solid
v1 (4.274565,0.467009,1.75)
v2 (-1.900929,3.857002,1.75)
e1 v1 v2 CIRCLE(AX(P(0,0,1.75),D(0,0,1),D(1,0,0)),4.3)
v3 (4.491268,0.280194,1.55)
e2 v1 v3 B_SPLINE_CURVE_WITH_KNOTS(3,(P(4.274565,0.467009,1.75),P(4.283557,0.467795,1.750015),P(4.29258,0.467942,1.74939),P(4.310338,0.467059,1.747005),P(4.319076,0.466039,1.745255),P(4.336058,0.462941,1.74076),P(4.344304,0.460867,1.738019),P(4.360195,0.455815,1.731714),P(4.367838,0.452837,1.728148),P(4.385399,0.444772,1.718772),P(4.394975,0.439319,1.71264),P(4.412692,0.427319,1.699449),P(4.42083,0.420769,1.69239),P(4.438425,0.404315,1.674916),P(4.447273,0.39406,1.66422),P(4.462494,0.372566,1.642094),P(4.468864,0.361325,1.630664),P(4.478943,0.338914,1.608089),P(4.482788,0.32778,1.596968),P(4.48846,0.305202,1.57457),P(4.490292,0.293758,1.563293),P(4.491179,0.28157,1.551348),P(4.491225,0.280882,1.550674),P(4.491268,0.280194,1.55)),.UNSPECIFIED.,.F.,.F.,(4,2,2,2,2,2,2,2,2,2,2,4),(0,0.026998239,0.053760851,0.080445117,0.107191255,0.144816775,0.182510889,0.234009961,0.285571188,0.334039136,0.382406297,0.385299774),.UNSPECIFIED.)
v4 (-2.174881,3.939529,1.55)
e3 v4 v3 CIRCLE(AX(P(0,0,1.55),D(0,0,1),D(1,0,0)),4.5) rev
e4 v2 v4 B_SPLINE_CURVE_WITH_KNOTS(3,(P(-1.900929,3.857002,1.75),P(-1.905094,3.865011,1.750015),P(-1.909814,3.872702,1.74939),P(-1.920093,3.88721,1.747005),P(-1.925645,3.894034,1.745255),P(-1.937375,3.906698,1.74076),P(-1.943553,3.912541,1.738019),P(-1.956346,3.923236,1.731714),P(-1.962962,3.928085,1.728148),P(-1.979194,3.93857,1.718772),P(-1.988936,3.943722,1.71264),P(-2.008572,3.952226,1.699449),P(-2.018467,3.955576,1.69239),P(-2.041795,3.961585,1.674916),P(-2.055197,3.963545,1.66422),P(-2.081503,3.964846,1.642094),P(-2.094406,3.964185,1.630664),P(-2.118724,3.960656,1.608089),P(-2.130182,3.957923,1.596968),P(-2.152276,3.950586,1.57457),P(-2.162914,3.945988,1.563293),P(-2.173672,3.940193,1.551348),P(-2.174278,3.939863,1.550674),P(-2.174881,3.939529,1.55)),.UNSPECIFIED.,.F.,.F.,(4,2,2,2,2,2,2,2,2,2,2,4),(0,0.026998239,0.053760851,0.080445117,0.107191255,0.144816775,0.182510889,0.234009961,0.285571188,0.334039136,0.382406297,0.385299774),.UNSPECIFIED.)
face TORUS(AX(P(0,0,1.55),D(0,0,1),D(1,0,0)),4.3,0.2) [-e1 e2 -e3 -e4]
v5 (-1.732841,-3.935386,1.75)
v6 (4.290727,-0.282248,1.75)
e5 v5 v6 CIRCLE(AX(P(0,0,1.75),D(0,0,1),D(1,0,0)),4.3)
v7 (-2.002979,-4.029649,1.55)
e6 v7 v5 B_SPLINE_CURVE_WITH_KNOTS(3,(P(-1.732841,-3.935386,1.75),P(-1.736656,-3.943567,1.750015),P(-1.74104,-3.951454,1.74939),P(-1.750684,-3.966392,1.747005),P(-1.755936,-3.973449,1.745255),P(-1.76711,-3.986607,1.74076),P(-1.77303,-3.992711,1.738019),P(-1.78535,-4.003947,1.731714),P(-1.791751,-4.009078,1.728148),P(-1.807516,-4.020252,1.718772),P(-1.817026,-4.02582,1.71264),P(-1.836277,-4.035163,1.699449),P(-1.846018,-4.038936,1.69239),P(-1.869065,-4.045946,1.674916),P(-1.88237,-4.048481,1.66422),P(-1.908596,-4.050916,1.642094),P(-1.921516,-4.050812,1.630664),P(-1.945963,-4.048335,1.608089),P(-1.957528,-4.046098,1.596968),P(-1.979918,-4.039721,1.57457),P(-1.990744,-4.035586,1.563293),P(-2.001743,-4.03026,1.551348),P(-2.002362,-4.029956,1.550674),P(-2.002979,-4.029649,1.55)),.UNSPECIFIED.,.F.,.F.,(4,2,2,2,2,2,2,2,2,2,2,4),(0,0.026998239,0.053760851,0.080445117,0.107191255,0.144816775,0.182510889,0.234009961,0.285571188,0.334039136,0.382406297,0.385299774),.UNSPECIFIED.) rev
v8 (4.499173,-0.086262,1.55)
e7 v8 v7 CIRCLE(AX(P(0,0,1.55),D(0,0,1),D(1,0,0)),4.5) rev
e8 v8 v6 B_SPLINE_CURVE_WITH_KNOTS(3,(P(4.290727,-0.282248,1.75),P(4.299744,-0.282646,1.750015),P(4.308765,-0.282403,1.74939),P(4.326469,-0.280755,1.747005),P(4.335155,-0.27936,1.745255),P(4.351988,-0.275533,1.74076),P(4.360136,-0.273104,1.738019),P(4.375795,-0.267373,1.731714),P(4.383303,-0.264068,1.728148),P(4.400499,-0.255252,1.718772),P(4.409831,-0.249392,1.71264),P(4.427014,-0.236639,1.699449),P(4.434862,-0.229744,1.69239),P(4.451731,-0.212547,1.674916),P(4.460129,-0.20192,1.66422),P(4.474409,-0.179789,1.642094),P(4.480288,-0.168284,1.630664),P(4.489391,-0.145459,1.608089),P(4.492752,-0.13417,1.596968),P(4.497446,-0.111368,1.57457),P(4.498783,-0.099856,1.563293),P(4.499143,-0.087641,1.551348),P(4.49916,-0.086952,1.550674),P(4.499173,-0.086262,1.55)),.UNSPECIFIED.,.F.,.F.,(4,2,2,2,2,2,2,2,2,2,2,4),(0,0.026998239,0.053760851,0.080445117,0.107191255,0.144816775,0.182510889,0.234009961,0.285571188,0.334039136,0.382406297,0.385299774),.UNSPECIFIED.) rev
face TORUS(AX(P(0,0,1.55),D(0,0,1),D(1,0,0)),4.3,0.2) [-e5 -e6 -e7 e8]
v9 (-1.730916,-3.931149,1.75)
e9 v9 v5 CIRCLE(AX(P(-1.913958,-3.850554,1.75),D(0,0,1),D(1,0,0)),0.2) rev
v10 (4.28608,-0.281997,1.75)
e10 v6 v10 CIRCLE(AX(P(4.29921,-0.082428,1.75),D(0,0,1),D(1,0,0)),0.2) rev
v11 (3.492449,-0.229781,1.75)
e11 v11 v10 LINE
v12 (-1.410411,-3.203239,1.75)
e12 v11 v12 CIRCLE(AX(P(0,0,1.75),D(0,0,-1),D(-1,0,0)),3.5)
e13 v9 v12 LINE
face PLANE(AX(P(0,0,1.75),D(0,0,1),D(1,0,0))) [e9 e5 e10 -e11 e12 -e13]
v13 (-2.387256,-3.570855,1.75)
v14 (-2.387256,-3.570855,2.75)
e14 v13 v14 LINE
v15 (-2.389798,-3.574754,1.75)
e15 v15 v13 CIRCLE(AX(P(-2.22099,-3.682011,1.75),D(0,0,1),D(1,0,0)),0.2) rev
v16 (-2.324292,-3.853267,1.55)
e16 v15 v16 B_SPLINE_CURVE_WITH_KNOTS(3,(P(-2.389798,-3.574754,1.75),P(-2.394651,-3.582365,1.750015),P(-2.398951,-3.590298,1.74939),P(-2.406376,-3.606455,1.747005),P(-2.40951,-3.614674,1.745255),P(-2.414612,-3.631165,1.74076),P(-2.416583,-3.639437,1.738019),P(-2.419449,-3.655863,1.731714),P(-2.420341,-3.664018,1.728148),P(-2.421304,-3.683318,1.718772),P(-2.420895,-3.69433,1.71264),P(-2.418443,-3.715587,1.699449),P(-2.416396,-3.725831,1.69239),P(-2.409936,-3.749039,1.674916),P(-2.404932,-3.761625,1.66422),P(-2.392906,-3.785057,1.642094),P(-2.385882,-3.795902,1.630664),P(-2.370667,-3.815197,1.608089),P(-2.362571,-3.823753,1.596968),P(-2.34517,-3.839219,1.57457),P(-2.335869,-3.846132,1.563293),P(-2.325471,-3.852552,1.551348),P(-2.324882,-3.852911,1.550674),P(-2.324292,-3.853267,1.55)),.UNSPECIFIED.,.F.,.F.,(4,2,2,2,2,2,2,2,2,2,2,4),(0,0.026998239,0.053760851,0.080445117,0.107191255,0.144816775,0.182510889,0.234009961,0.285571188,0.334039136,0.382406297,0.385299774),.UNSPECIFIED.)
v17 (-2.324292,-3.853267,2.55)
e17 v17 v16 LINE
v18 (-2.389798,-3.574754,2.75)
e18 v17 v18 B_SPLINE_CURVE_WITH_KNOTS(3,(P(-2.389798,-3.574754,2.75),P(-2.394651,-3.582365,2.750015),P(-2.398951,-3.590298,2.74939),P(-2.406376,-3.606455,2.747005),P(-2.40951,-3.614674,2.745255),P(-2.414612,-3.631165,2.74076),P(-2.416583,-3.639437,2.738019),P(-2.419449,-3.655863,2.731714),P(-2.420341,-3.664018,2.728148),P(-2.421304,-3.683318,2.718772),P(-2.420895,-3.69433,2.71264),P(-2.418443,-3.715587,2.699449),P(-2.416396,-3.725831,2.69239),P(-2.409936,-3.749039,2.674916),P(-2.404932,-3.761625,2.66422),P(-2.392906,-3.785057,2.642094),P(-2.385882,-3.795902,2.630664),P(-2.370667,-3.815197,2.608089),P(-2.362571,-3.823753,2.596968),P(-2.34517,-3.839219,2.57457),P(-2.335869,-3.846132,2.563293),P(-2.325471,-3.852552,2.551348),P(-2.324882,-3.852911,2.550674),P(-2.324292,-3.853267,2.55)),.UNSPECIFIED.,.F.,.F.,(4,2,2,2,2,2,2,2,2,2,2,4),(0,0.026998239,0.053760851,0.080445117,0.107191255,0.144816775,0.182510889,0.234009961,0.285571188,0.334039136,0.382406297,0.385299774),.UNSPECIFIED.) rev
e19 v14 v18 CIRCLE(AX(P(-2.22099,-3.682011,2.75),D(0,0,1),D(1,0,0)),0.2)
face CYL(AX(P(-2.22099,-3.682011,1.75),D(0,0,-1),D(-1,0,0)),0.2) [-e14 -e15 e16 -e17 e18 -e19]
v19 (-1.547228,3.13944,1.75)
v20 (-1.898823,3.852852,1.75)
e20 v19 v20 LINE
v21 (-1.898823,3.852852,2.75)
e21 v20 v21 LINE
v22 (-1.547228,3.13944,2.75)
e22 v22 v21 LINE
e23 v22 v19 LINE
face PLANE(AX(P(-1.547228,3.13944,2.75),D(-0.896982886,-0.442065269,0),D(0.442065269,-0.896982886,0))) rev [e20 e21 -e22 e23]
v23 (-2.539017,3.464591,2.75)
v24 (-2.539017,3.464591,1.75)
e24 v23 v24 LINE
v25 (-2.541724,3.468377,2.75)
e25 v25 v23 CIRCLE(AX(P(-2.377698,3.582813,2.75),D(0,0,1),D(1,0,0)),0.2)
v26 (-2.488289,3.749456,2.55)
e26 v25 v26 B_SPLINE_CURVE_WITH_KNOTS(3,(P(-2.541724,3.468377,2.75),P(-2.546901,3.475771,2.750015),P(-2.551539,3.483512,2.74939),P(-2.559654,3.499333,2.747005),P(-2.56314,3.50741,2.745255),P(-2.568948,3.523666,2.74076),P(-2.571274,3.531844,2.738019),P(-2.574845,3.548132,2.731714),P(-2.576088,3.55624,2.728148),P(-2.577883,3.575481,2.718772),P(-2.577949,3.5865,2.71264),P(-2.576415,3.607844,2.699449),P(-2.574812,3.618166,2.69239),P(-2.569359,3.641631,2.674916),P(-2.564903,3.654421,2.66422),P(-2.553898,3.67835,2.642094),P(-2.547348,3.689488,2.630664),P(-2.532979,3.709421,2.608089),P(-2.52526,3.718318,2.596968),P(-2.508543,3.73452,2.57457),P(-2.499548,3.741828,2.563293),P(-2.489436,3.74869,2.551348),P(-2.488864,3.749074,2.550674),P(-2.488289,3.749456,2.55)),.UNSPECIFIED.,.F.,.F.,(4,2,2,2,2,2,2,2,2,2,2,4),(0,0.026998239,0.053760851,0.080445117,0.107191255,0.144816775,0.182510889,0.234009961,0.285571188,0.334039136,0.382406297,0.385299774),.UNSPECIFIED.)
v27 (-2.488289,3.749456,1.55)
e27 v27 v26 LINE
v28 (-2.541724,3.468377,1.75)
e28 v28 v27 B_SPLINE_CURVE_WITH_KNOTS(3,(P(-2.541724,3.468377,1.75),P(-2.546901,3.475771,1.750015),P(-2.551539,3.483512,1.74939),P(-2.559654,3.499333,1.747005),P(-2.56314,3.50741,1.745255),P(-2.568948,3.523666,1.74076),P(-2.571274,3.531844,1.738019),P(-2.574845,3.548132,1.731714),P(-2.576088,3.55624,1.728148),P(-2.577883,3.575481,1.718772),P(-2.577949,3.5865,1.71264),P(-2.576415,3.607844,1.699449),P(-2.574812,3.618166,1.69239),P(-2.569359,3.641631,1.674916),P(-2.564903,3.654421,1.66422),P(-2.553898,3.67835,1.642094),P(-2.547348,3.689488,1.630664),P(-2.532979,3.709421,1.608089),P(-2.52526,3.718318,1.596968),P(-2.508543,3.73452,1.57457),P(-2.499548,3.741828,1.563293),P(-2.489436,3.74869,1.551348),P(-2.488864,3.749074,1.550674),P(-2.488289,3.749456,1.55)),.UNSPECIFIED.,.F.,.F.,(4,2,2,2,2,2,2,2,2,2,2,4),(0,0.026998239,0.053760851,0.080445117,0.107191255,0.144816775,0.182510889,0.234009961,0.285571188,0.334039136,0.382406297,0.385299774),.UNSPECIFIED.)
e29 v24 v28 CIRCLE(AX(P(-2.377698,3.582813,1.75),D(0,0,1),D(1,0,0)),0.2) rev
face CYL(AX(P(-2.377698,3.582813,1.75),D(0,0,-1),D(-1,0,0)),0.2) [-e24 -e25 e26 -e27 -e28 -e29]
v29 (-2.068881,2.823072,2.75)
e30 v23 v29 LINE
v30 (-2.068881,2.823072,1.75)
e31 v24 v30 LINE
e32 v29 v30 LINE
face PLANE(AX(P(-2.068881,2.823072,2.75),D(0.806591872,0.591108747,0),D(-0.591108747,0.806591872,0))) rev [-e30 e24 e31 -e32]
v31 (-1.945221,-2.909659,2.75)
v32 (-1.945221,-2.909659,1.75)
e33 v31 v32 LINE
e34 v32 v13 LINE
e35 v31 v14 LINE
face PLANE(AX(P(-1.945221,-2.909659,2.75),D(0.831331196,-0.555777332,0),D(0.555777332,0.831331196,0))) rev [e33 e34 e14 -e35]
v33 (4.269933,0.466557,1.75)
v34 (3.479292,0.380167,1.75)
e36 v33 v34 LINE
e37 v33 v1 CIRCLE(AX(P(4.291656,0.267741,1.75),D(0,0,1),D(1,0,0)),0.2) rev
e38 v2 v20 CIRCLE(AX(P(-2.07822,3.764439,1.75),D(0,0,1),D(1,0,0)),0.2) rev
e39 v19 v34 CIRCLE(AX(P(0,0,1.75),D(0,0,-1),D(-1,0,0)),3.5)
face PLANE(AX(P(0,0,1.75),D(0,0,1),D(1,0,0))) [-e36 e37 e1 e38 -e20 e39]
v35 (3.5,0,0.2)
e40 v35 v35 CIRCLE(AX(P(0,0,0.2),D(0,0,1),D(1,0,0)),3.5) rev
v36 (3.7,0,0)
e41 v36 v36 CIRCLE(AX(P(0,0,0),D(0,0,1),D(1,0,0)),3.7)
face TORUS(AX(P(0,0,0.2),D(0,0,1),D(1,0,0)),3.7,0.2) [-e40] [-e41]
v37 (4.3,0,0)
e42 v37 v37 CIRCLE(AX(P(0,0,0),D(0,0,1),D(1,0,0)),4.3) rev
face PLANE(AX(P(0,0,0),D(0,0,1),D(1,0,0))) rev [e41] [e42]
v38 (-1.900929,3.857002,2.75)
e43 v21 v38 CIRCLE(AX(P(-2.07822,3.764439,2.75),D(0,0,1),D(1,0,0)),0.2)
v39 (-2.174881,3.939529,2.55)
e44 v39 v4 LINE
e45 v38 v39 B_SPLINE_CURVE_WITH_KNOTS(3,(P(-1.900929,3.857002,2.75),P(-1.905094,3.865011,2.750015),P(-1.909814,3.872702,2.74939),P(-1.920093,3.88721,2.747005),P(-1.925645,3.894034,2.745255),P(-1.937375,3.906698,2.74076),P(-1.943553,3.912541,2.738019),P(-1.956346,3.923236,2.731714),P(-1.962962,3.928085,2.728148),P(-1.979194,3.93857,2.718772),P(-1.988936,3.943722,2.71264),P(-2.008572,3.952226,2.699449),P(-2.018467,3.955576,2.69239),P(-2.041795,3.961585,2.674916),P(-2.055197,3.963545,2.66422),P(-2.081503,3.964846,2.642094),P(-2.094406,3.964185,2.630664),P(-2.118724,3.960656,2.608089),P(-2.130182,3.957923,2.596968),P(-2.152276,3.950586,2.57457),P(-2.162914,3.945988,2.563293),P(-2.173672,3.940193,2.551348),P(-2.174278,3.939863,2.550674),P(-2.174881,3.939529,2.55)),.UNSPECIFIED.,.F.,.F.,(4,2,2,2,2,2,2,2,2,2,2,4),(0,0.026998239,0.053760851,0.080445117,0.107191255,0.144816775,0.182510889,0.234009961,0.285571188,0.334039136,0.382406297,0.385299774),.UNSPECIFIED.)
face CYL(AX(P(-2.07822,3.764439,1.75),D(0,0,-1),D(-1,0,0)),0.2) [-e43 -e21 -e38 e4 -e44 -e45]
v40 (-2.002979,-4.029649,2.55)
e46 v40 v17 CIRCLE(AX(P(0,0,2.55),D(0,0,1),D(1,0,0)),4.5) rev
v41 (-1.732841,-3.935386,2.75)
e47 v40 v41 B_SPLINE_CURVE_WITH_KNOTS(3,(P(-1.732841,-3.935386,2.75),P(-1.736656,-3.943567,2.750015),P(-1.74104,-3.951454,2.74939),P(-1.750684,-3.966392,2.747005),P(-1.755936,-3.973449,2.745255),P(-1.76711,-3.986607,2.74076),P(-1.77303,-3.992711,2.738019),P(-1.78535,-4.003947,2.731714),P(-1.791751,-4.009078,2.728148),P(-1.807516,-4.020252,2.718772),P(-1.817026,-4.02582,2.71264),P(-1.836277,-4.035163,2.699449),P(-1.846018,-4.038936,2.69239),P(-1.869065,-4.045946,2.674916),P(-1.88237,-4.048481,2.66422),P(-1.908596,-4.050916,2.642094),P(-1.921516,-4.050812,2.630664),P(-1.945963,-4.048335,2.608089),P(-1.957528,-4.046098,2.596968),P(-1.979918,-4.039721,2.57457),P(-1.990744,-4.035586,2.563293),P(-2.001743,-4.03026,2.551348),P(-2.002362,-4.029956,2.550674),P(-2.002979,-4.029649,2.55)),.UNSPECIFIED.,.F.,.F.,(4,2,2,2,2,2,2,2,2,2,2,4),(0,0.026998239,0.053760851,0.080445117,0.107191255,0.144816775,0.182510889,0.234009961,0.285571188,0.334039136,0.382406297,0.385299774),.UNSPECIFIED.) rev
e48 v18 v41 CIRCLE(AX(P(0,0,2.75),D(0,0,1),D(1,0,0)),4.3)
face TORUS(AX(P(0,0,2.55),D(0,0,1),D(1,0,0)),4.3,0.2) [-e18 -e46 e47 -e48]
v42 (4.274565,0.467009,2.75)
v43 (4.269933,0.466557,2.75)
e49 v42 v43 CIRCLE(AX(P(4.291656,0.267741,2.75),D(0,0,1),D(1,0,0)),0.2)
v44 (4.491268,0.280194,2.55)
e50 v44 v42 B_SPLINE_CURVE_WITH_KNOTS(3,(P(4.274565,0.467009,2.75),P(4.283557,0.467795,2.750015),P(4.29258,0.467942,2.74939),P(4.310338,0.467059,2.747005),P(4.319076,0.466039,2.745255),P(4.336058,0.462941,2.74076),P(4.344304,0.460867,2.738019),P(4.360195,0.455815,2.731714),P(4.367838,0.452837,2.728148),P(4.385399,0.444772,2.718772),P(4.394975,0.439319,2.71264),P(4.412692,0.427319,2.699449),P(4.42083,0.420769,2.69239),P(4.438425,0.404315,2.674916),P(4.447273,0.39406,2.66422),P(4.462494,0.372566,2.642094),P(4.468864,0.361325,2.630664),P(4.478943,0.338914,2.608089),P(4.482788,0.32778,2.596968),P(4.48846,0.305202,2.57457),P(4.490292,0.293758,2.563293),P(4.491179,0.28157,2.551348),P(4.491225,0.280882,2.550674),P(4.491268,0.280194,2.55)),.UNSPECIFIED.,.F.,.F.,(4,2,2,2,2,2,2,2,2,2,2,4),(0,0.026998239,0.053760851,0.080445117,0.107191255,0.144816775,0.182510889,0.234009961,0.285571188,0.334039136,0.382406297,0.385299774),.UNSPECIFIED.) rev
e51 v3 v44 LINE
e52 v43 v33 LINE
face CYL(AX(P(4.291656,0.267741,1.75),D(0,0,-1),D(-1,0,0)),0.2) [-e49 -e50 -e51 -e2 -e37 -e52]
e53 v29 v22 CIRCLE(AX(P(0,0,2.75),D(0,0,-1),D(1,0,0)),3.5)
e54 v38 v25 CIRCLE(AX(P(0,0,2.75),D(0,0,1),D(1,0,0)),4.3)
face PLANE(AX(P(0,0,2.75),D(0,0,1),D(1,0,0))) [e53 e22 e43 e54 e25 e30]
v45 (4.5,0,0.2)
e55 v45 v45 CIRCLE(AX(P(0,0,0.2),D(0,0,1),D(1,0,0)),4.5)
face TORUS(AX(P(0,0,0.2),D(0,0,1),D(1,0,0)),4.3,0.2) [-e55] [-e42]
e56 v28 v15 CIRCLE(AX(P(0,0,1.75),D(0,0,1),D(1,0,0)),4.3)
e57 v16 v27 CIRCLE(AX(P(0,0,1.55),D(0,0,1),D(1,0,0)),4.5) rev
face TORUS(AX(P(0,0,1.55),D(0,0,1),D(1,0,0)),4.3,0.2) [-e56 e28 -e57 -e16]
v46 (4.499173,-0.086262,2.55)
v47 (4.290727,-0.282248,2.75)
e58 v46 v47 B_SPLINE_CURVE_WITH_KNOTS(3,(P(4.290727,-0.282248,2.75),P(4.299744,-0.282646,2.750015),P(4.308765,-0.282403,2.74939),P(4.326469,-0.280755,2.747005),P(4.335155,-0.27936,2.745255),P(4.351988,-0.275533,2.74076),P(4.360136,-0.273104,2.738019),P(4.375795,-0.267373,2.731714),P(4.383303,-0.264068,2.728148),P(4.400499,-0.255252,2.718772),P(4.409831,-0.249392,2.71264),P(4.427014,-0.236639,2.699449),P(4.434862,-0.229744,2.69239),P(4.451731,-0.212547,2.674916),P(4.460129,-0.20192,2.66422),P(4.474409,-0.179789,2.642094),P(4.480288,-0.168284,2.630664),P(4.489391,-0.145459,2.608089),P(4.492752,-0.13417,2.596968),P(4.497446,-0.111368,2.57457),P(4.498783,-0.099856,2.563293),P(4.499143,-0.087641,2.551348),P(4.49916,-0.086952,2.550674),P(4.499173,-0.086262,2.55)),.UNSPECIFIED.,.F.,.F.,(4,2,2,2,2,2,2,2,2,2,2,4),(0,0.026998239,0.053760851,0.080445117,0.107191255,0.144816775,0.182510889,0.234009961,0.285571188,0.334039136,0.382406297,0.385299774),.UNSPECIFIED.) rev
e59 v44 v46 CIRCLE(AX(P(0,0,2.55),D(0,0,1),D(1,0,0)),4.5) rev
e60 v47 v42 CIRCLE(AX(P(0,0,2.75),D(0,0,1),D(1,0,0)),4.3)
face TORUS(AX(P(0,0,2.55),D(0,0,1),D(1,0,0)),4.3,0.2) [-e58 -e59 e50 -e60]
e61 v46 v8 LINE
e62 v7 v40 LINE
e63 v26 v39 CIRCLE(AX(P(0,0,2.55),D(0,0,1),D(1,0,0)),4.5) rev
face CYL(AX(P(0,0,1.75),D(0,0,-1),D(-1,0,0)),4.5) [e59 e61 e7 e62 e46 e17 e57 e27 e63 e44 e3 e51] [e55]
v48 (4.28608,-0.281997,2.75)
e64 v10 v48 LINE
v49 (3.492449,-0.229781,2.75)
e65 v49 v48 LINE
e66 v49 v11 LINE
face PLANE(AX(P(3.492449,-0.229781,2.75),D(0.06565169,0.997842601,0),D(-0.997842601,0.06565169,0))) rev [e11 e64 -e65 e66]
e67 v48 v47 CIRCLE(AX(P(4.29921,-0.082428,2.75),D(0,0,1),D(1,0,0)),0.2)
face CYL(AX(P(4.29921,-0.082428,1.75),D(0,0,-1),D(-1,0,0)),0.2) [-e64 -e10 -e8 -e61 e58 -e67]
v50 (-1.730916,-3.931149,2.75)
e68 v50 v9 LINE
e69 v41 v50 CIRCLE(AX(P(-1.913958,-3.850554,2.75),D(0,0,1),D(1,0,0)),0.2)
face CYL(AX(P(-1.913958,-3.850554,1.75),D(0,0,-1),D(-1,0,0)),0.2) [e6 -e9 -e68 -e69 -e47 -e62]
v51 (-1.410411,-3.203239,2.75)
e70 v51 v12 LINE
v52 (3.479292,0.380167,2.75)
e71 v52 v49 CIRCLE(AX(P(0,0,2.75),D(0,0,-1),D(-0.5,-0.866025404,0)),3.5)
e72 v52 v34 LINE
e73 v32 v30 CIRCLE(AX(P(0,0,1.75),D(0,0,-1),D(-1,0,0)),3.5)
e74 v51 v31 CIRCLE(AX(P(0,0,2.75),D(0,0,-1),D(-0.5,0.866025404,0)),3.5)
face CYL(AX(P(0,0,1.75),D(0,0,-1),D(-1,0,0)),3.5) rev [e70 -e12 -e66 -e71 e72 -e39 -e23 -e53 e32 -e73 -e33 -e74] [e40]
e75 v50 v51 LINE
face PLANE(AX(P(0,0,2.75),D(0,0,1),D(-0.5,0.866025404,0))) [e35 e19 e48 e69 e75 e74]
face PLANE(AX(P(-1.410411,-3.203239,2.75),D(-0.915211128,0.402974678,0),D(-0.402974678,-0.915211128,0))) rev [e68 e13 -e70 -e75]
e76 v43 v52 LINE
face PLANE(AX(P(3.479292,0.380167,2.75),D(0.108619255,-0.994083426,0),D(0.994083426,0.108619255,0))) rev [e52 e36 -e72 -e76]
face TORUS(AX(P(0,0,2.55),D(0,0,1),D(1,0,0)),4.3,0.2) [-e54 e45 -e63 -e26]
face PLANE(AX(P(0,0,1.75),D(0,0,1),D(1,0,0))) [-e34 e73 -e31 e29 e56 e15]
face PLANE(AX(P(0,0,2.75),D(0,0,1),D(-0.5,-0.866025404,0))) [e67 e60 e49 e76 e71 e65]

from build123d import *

# Parameters (mm, degrees)
SKETCH_1_R               = 4.5
EXTRUDE_1_DEPTH          = 1.75
SKETCH_2_R               = 3.5
CUT_EXTRUDE_1_DEPTH      = 1.75
EXTRUDE_2_DEPTH          = 1
PATTERN_CIRCULAR_2_COUNT = 3
FILLET_1_R               = 0.2


with BuildPart() as part:
    # 草图1 → 凸台-拉伸1 (new body)
    with BuildSketch(Plane.XY):
        Circle(SKETCH_1_R)
    extrude(amount=EXTRUDE_1_DEPTH)

    # 草图2 → 切除-拉伸1 (cut)
    with BuildSketch(Plane(origin=(0, 0, 0), x_dir=(-1, 0, 0), z_dir=(0, 0, -1))):
        Circle(SKETCH_2_R)
    extrude(amount=-CUT_EXTRUDE_1_DEPTH, mode=Mode.SUBTRACT)

    # 草图3 → 凸台-拉伸2 (add)
    with BuildSketch(Plane.XY.offset(1.75)):
        with BuildLine():
            Line((-1.54722844, 3.139440102), (-1.989293708, 4.036422988))
            ThreePointArc((-1.989293708, 4.036422988), (-2.333521289, 3.84768481), (-2.659989363, 3.629663426))
            Line((-2.659989363, 3.629663426), (-2.068880616, 2.823071554))
            ThreePointArc((-2.068880616, 2.823071554), (-1.814961002, 2.992643741), (-1.54722844, 3.139440102))
        make_face()
    extrude_2 = extrude(amount=EXTRUDE_2_DEPTH)

    # 阵列(圆周)2: 凸台-拉伸2 ×3 about axis
    pattern_circular_2_axis = Axis((0, 0, 0), (0, 0, 1))
    for i in range(1, PATTERN_CIRCULAR_2_COUNT):
        add(extrude_2.rotate(pattern_circular_2_axis, i * 360 / PATTERN_CIRCULAR_2_COUNT))

    # 圆角1
    # the kernel refuses this fillet: 0.2 mm, written as the material it takes off along each edge
    with BuildSketch(Plane(origin=(0, 0, 1.75), x_dir=(-0.5911087473826521, 0.8065918724904882, 0), z_dir=(0.8065918724904882, 0.5911087473826521, 0))) as fillet_1_piece_1:
        with BuildLine():
            CenterArc((4.5 - FILLET_1_R, -FILLET_1_R), FILLET_1_R, 0, 90)
            Line((4.5 - FILLET_1_R, 0), (4.5, 0))
            Line((4.5, 0), (4.5, -FILLET_1_R))
        make_face()
    revolve(axis=Axis((0, 0, 1.75), (0, 0, 1)), revolution_arc=110, mode=Mode.SUBTRACT)
    with BuildSketch(Plane(origin=(-1.989293708, 4.036422988, 1.75), x_dir=(-0.8864567929305034, -0.4628113592678625, 0), z_dir=(0, 0, 1)), Plane(origin=(4.490291703, -0.295432607, 1.75), x_dir=(0.042422002179279744, 0.9990997816690289, 0), z_dir=(0, 0, 1)), Plane(origin=(-2.500997994, -3.740990381, 1.75), x_dir=(0.8440347907512271, -0.5362884224011667, 0), z_dir=(0, 0, 1))) as fillet_1_piece_2:
        with BuildLine():
            CenterArc((0.204706556, 0.19994588), FILLET_1_R, 178.667059118, 92.665881765)
            Line((0.004760676, 0.204598302), (0, 0))
            ThreePointArc((0, 0), (0.104679489, -0.001217698), (0.209358978, 0))
        make_face()
    extrude(amount=1.523397445, mode=Mode.SUBTRACT)
    with BuildSketch(Plane(origin=(-2.659989363, 3.629663426, 1.75), x_dir=(0.820124045079819, 0.5721857658854467, 0), z_dir=(0, 0, 1)), Plane(origin=(4.473375416, 0.488786649, 1.75), x_dir=(0.08546538640074963, -0.9963411402362999, 0), z_dir=(0, 0, 1)), Plane(origin=(-1.813386053, -4.118450075, 1.75), x_dir=(-0.905589431480564, 0.4241553743508489, 0), z_dir=(0, 0, 1))) as fillet_1_piece_3:
        with BuildLine():
            CenterArc((0.204706556, -0.19994588), FILLET_1_R, 88.667059118, 92.665881765)
            Line((0.004760676, -0.204598302), (0, 0))
            ThreePointArc((0, 0), (0.104679489, 0.001217698), (0.209358978, 0))
        make_face()
    extrude(amount=1.523397445, mode=Mode.SUBTRACT)
    with BuildSketch(Plane(origin=(0, 0, 2.75), x_dir=(-0.3398789385562205, 0.9404691952030628, 0), z_dir=(0.9404691952030628, 0.3398789385562205, 0))) as fillet_1_piece_4:
        with BuildLine():
            CenterArc((4.5 - FILLET_1_R, -FILLET_1_R), FILLET_1_R, 0, 90)
            Line((4.5 - FILLET_1_R, 0), (4.5, 0))
            Line((4.5, 0), (4.5, -FILLET_1_R))
        make_face()
    revolve(axis=Axis((0, 0, 2.75), (0, 0, 1)), revolution_arc=22.732458574, mode=Mode.SUBTRACT)
    with BuildSketch(Plane(origin=(0, 0, 0), x_dir=(1, 0, 0), z_dir=(0, -1, 0))) as fillet_1_piece_5:
        with BuildLine():
            CenterArc((4.5 - FILLET_1_R, FILLET_1_R), FILLET_1_R, 270, 90)
            Line((4.5 - FILLET_1_R, 0), (4.5, 0))
            Line((4.5, 0), (4.5, FILLET_1_R))
        make_face()
    revolve(axis=Axis((0, 0, 0), (0, 0, 1)), mode=Mode.SUBTRACT)
    with BuildSketch(Plane(origin=(0, 0, 1.75), x_dir=(0.9940834257541477, 0.1086192553873306, 0), z_dir=(0.1086192553873306, -0.9940834257541477, 0))) as fillet_1_piece_6:
        with BuildLine():
            CenterArc((4.5 - FILLET_1_R, -FILLET_1_R), FILLET_1_R, 0, 90)
            Line((4.5 - FILLET_1_R, 0), (4.5, 0))
            Line((4.5, 0), (4.5, -FILLET_1_R))
        make_face()
    revolve(axis=Axis((0, 0, 1.75), (0, 0, 1)), revolution_arc=110, mode=Mode.SUBTRACT)
    with BuildSketch(Plane(origin=(0, 0, 2.75), x_dir=(0.9844096838006688, -0.17589080260055465, 0), z_dir=(-0.17589080260055465, -0.9844096838006688, 0))) as fillet_1_piece_7:
        with BuildLine():
            CenterArc((4.5 - FILLET_1_R, -FILLET_1_R), FILLET_1_R, 0, 90)
            Line((4.5 - FILLET_1_R, 0), (4.5, 0))
            Line((4.5, 0), (4.5, -FILLET_1_R))
        make_face()
    revolve(axis=Axis((0, 0, 2.75), (0, 0, 1)), revolution_arc=22.732458574, mode=Mode.SUBTRACT)
    with BuildSketch(Plane(origin=(0, 0, 1.75), x_dir=(-0.40297467837149564, -0.9152111278778191, 0), z_dir=(-0.9152111278778191, 0.40297467837149564, 0))) as fillet_1_piece_8:
        with BuildLine():
            CenterArc((4.5 - FILLET_1_R, -FILLET_1_R), FILLET_1_R, 0, 90)
            Line((4.5 - FILLET_1_R, 0), (4.5, 0))
            Line((4.5, 0), (4.5, -FILLET_1_R))
        make_face()
    revolve(axis=Axis((0, 0, 1.75), (0, 0, 1)), revolution_arc=110, mode=Mode.SUBTRACT)
    with BuildSketch(Plane(origin=(0, 0, 2.75), x_dir=(-0.6445307452444484, -0.7645783926025087, 0), z_dir=(-0.7645783926025087, 0.6445307452444484, 0))) as fillet_1_piece_9:
        with BuildLine():
            CenterArc((4.5 - FILLET_1_R, -FILLET_1_R), FILLET_1_R, 0, 90)
            Line((4.5 - FILLET_1_R, 0), (4.5, 0))
            Line((4.5, 0), (4.5, -FILLET_1_R))
        make_face()
    revolve(axis=Axis((0, 0, 2.75), (0, 0, 1)), revolution_arc=22.732458574, mode=Mode.SUBTRACT)
    with BuildSketch(Plane(origin=(0, 0, 0), x_dir=(-1, 0, 0), z_dir=(0, -1, 0))) as fillet_1_piece_10:
        with BuildLine():
            CenterArc((3.5 + FILLET_1_R, -FILLET_1_R), FILLET_1_R, 90, 90)
            Line((3.5, -FILLET_1_R), (3.5, 0))
            Line((3.5, 0), (3.5 + FILLET_1_R, 0))
        make_face()
    revolve(axis=Axis((0, 0, 0), (0, 0, -1)), mode=Mode.SUBTRACT)
    with BuildSketch(Plane(origin=(-2.659989363, 3.629663426, 1.226602555), x_dir=(0.8201240450798175, 0.5721857658854486, 0), z_dir=(0, 0, 1))) as fillet_1_piece_11a_section:
        with BuildLine():
            CenterArc((0.204706556, -0.19994588), FILLET_1_R, 88.667059118, 92.665881765)
            Line((0.004760676, -0.204598302), (0, 0))
            ThreePointArc((0, 0), (0.104679489, 0.001217698), (0.209358978, 0))
        make_face()
    fillet_1_piece_11a = extrude(amount=2.04679489, mode=Mode.PRIVATE)
    fillet_1_piece_11a = split(fillet_1_piece_11a, bisect_by=Plane(origin=(-2.59395086, 3.620118338, 1.75), z_dir=(0, 0, -1)), keep=Keep.TOP, mode=Mode.PRIVATE)
    with BuildSketch(Plane(origin=(0, 0, 1.75), x_dir=(-0.4979688255106006, 0.8671949312695462, 0), z_dir=(0.8671949312695462, 0.4979688255106006, 0))) as fillet_1_piece_11b_section:
        with BuildLine():
            CenterArc((4.5 - FILLET_1_R, -FILLET_1_R), FILLET_1_R, 0, 90)
            Line((4.5 - FILLET_1_R, 0), (4.5, 0))
            Line((4.5, 0), (4.5, -FILLET_1_R))
        make_face()
    fillet_1_piece_11b = revolve(axis=Axis((0, 0, 1.75), (0, 0, 1)), revolution_arc=116.370018498, mode=Mode.PRIVATE)
    fillet_1_piece_11b = split(fillet_1_piece_11b, bisect_by=Plane(origin=(-2.628049402, 3.586080053, 1.704474437), z_dir=(0.8065918724904881, 0.5911087473826522, 0)), keep=Keep.TOP, mode=Mode.PRIVATE)
    fillet_1_piece_11 = fillet_1_piece_11a & fillet_1_piece_11b
    add(fillet_1_piece_11, mode=Mode.SUBTRACT)
    with BuildSketch(Plane(origin=(0, 0, 1.75), x_dir=(-0.5911087473826521, 0.8065918724904882, 0), z_dir=(0.8065918724904882, 0.5911087473826521, 0))) as fillet_1_piece_12a_section:
        with BuildLine():
            CenterArc((4.5 - FILLET_1_R, -FILLET_1_R), FILLET_1_R, 0, 90)
            Line((4.5 - FILLET_1_R, 0), (4.5, 0))
            Line((4.5, 0), (4.5, -FILLET_1_R))
        make_face()
    fillet_1_piece_12a = revolve(axis=Axis((0, 0, 1.75), (0, 0, 1)), revolution_arc=116.370018498, mode=Mode.PRIVATE)
    fillet_1_piece_12a = split(fillet_1_piece_12a, bisect_by=Plane(origin=(-2.47096713, -3.696070243, 1.704474437), z_dir=(0.8313311958319957, -0.5557773320643297, 0)), keep=Keep.TOP, mode=Mode.PRIVATE)
    with BuildSketch(Plane(origin=(-2.500997994, -3.740990381, 1.226602555), x_dir=(0.8440347907512287, -0.5362884224011644, 0), z_dir=(0, 0, 1))) as fillet_1_piece_12b_section:
        with BuildLine():
            CenterArc((0.204706556, 0.19994588), FILLET_1_R, 178.667059118, 92.665881765)
            Line((0.004760676, 0.204598302), (0, 0))
            ThreePointArc((0, 0), (0.104679489, -0.001217698), (0.209358978, 0))
        make_face()
    fillet_1_piece_12b = extrude(amount=2.04679489, mode=Mode.PRIVATE)
    fillet_1_piece_12b = split(fillet_1_piece_12b, bisect_by=Plane(origin=(-2.435432519, -3.728606481, 1.75), z_dir=(0, 0, -1)), keep=Keep.TOP, mode=Mode.PRIVATE)
    fillet_1_piece_12 = fillet_1_piece_12a & fillet_1_piece_12b
    add(fillet_1_piece_12, mode=Mode.SUBTRACT)
    with BuildSketch(Plane(origin=(0, 0, 1.75), x_dir=(0.9940834257541477, 0.1086192553873306, 0), z_dir=(0.1086192553873306, -0.9940834257541477, 0))) as fillet_1_piece_13a_section:
        with BuildLine():
            CenterArc((4.5 - FILLET_1_R, -FILLET_1_R), FILLET_1_R, 0, 90)
            Line((4.5 - FILLET_1_R, 0), (4.5, 0))
            Line((4.5, 0), (4.5, -FILLET_1_R))
        make_face()
    fillet_1_piece_13a = revolve(axis=Axis((0, 0, 1.75), (0, 0, 1)), revolution_arc=116.370018498, mode=Mode.PRIVATE)
    fillet_1_piece_13a = split(fillet_1_piece_13a, bisect_by=Plane(origin=(-1.96540716, 3.987955428, 1.704474437), z_dir=(-0.8969828863312469, -0.44206526851683975, 0)), keep=Keep.TOP, mode=Mode.PRIVATE)
    with BuildSketch(Plane(origin=(-1.989293708, 4.036422988, 1.226602555), x_dir=(-0.886456792930503, -0.4628113592678634, 0), z_dir=(0, 0, 1))) as fillet_1_piece_13b_section:
        with BuildLine():
            CenterArc((0.204706556, 0.19994588), FILLET_1_R, 178.667059118, 92.665881765)
            Line((0.004760676, 0.204598302), (0, 0))
            ThreePointArc((0, 0), (0.104679489, -0.001217698), (0.209358978, 0))
        make_face()
    fillet_1_piece_13b = extrude(amount=2.04679489, mode=Mode.PRIVATE)
    fillet_1_piece_13b = split(fillet_1_piece_13b, bisect_by=Plane(origin=(-2.011351674, 3.973449671, 1.75), z_dir=(0, 0, -1)), keep=Keep.TOP, mode=Mode.PRIVATE)
    fillet_1_piece_13 = fillet_1_piece_13a & fillet_1_piece_13b
    add(fillet_1_piece_13, mode=Mode.SUBTRACT)
    with BuildSketch(Plane(origin=(4.473375416, 0.488786649, 1.226602555), x_dir=(0.0854653864007455, -0.9963411402363004, 0), z_dir=(0, 0, 1))) as fillet_1_piece_14a_section:
        with BuildLine():
            CenterArc((0.204706556, -0.19994588), FILLET_1_R, 88.667059118, 92.665881765)
            Line((0.004760676, -0.204598302), (0, 0))
            ThreePointArc((0, 0), (0.104679489, 0.001217698), (0.209358978, 0))
        make_face()
    fillet_1_piece_14a = extrude(amount=2.04679489, mode=Mode.PRIVATE)
    fillet_1_piece_14a = split(fillet_1_piece_14a, bisect_by=Plane(origin=(4.432089875, 0.436368172, 1.75), z_dir=(0, 0, -1)), keep=Keep.TOP, mode=Mode.PRIVATE)
    with BuildSketch(Plane(origin=(0, 0, 1.75), x_dir=(0.9999972532678275, -0.0023438124498927643, 0), z_dir=(-0.0023438124498927643, -0.9999972532678275, 0))) as fillet_1_piece_14b_section:
        with BuildLine():
            CenterArc((4.5 - FILLET_1_R, -FILLET_1_R), FILLET_1_R, 0, 90)
            Line((4.5 - FILLET_1_R, 0), (4.5, 0))
            Line((4.5, 0), (4.5, -FILLET_1_R))
        make_face()
    fillet_1_piece_14b = revolve(axis=Axis((0, 0, 1.75), (0, 0, 1)), revolution_arc=116.370018498, mode=Mode.PRIVATE)
    fillet_1_piece_14b = split(fillet_1_piece_14b, bisect_by=Plane(origin=(4.419661127, 0.482917518, 1.704474437), z_dir=(0.10861925538733055, -0.9940834257541478, 0)), keep=Keep.TOP, mode=Mode.PRIVATE)
    fillet_1_piece_14 = fillet_1_piece_14a & fillet_1_piece_14b
    add(fillet_1_piece_14, mode=Mode.SUBTRACT)
    with BuildSketch(Plane(origin=(4.490291703, -0.295432607, 1.226602555), x_dir=(0.04242200217927562, 0.999099781669029, 0), z_dir=(0, 0, 1))) as fillet_1_piece_15a_section:
        with BuildLine():
            CenterArc((0.204706556, 0.19994588), FILLET_1_R, 178.667059118, 92.665881765)
            Line((0.004760676, 0.204598302), (0, 0))
            ThreePointArc((0, 0), (0.104679489, -0.001217698), (0.209358978, 0))
        make_face()
    fillet_1_piece_15a = extrude(amount=2.04679489, mode=Mode.PRIVATE)
    fillet_1_piece_15a = split(fillet_1_piece_15a, bisect_by=Plane(origin=(4.446784193, -0.24484319, 1.75), z_dir=(0, 0, -1)), keep=Keep.TOP, mode=Mode.PRIVATE)
    with BuildSketch(Plane(origin=(0, 0, 1.75), x_dir=(-0.40297467837149564, -0.9152111278778191, 0), z_dir=(-0.9152111278778191, 0.40297467837149564, 0))) as fillet_1_piece_15b_section:
        with BuildLine():
            CenterArc((4.5 - FILLET_1_R, -FILLET_1_R), FILLET_1_R, 0, 90)
            Line((4.5 - FILLET_1_R, 0), (4.5, 0))
            Line((4.5, 0), (4.5, -FILLET_1_R))
        make_face()
    fillet_1_piece_15b = revolve(axis=Axis((0, 0, 1.75), (0, 0, 1)), revolution_arc=116.370018498, mode=Mode.PRIVATE)
    fillet_1_piece_15b = split(fillet_1_piece_15b, bisect_by=Plane(origin=(4.43637429, -0.291885185, 1.704474437), z_dir=(0.06565169049925154, 0.9978426005811692, 0)), keep=Keep.TOP, mode=Mode.PRIVATE)
    fillet_1_piece_15 = fillet_1_piece_15a & fillet_1_piece_15b
    add(fillet_1_piece_15, mode=Mode.SUBTRACT)
    with BuildSketch(Plane(origin=(0, 0, 1.75), x_dir=(-0.5020284277572276, -0.8648511188196534, 0), z_dir=(-0.8648511188196534, 0.5020284277572276, 0))) as fillet_1_piece_16a_section:
        with BuildLine():
            CenterArc((4.5 - FILLET_1_R, -FILLET_1_R), FILLET_1_R, 0, 90)
            Line((4.5 - FILLET_1_R, 0), (4.5, 0))
            Line((4.5, 0), (4.5, -FILLET_1_R))
        make_face()
    fillet_1_piece_16a = revolve(axis=Axis((0, 0, 1.75), (0, 0, 1)), revolution_arc=116.370018498, mode=Mode.PRIVATE)
    fillet_1_piece_16a = split(fillet_1_piece_16a, bisect_by=Plane(origin=(-1.791611725, -4.068997571, 1.704474437), z_dir=(-0.9152111278778191, 0.40297467837149553, 0)), keep=Keep.TOP, mode=Mode.PRIVATE)
    with BuildSketch(Plane(origin=(-1.813386053, -4.118450075, 1.226602555), x_dir=(-0.9055894314805639, 0.4241553743508493, 0), z_dir=(0, 0, 1))) as fillet_1_piece_16b_section:
        with BuildLine():
            CenterArc((0.204706556, -0.19994588), FILLET_1_R, 88.667059118, 92.665881765)
            Line((0.004760676, -0.204598302), (0, 0))
            ThreePointArc((0, 0), (0.104679489, 0.001217698), (0.209358978, 0))
        make_face()
    fillet_1_piece_16b = extrude(amount=2.04679489, mode=Mode.PRIVATE)
    fillet_1_piece_16b = split(fillet_1_piece_16b, bisect_by=Plane(origin=(-1.838139015, -4.05648651, 1.75), z_dir=(0, 0, -1)), keep=Keep.TOP, mode=Mode.PRIVATE)
    fillet_1_piece_16 = fillet_1_piece_16a & fillet_1_piece_16b
    add(fillet_1_piece_16, mode=Mode.SUBTRACT)


solid = part.part
